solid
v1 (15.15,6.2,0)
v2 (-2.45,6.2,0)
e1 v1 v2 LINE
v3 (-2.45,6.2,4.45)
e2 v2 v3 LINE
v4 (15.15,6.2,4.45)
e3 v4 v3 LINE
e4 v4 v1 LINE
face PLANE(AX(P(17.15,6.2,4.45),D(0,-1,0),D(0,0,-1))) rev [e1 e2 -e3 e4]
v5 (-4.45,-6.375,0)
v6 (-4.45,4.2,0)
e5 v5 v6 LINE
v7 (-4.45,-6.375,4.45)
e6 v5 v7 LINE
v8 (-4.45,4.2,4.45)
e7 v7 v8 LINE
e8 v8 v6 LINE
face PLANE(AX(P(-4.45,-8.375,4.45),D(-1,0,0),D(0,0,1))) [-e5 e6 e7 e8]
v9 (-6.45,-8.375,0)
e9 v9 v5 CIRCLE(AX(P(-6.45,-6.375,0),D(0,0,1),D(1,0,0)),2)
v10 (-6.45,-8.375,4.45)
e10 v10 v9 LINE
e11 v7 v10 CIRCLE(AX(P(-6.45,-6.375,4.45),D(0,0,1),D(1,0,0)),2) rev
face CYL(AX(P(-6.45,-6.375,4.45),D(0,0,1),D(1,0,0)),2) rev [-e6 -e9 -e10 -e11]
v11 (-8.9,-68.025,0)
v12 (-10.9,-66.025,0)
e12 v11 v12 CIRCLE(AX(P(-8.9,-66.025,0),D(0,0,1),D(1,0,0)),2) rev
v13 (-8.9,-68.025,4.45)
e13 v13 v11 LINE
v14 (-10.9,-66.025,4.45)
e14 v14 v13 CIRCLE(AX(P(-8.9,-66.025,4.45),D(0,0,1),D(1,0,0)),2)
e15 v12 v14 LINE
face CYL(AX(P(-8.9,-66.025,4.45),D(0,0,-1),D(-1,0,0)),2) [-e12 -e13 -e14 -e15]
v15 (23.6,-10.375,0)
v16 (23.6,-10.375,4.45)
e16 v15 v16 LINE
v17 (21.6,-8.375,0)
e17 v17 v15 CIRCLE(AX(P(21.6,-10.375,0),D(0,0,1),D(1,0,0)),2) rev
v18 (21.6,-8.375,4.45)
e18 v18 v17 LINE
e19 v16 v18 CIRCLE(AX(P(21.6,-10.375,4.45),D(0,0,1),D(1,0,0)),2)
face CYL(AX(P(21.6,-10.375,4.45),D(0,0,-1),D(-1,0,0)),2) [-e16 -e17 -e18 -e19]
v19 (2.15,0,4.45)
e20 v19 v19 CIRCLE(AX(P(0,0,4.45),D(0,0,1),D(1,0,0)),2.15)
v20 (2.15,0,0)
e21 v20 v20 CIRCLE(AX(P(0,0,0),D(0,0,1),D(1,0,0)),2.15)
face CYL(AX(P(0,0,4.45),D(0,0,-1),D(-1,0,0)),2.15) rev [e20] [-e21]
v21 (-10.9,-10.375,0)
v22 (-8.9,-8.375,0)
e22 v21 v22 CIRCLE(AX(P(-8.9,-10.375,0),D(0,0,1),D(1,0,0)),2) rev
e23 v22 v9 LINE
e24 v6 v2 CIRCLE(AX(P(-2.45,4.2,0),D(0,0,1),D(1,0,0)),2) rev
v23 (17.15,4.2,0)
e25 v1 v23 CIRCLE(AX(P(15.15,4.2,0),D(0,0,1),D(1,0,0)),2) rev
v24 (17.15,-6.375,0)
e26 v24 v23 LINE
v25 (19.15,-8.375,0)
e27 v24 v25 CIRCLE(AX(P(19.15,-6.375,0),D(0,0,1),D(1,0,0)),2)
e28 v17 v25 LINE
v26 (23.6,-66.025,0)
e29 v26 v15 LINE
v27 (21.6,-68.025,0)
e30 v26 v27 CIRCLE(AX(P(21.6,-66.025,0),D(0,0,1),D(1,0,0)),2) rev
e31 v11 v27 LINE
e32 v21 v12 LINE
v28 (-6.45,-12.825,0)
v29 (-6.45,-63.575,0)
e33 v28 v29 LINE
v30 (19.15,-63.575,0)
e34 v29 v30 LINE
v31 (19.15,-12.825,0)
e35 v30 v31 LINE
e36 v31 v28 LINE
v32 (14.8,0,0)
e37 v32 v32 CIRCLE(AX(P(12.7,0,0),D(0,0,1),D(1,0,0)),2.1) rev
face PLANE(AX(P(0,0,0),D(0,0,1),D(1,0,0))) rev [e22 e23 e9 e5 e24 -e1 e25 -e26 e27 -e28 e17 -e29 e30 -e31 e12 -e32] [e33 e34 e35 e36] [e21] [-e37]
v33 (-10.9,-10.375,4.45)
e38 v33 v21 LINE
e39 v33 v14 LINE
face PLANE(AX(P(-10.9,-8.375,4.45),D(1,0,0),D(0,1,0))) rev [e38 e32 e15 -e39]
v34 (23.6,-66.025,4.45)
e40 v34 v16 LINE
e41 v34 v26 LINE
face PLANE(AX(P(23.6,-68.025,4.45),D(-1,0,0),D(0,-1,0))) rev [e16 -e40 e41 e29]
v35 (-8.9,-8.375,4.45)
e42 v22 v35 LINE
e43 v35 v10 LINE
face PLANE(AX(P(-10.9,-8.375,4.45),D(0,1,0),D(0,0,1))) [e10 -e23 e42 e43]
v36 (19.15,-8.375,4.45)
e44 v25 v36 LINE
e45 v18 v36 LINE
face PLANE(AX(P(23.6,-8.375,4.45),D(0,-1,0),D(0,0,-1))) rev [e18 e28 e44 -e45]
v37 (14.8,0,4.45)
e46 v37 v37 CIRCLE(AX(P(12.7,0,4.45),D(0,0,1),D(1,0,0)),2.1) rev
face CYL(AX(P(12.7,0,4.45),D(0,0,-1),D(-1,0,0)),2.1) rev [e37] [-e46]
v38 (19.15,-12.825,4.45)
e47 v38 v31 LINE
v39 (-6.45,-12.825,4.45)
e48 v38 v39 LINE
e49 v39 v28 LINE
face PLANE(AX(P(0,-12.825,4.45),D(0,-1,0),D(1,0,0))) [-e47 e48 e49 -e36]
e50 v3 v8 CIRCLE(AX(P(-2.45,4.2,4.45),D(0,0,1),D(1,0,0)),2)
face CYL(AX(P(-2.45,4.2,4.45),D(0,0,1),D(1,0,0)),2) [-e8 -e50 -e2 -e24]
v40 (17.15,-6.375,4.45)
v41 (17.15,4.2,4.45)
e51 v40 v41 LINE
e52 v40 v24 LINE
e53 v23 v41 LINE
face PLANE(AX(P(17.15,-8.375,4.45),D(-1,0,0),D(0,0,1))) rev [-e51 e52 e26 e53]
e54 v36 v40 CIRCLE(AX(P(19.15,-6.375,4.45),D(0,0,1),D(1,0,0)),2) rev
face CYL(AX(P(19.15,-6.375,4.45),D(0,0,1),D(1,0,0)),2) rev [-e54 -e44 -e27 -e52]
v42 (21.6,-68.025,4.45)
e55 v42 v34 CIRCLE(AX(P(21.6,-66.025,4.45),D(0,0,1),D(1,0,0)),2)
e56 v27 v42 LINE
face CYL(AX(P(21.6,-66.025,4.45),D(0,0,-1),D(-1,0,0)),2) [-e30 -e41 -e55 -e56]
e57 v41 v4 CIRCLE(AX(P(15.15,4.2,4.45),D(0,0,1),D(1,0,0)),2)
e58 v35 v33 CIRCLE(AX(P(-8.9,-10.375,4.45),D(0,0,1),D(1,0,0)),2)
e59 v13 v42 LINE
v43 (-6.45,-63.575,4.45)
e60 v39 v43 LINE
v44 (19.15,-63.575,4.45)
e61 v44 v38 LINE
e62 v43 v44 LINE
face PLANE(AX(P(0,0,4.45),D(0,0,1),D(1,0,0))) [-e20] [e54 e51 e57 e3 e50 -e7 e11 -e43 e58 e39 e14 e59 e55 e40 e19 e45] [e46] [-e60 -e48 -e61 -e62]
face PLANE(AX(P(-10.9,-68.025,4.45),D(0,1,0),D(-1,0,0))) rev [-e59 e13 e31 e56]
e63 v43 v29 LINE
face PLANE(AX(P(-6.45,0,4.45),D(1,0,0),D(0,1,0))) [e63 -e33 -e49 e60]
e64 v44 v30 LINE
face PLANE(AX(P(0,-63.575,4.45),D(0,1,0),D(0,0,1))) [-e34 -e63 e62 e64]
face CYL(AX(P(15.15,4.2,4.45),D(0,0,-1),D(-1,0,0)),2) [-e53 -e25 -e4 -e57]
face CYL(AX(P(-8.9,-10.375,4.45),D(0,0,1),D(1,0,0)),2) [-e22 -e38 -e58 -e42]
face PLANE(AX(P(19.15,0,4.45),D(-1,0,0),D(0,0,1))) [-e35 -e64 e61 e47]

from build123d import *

# Parameters (mm, degrees)
SKETCH3_W           = 25.6
SKETCH3_H           = 50.75
SKETCH3_R           = 2.15
SKETCH3_R_2         = 2.1
BOSS_EXTRUDE1_DEPTH = 4.45
FILLET1_R           = 2


with BuildPart() as part:
    # Sketch3 → Boss-Extrude1 (new body)
    with BuildSketch(Plane.XY):
        Polygon((-4.45, -8.375), (-10.9, -8.375), (-10.9, -68.025), (23.6, -68.025), (23.6, -8.375), (17.15, -8.375), (17.15, 6.2), (-4.45, 6.2), align=None)
        with Locations((6.35, -38.2)):
            Rectangle(SKETCH3_W, SKETCH3_H, mode=Mode.SUBTRACT)
        Circle(SKETCH3_R, mode=Mode.SUBTRACT)
        with Locations((12.7, 0)):
            Circle(SKETCH3_R_2, mode=Mode.SUBTRACT)
    extrude(amount=BOSS_EXTRUDE1_DEPTH)

    # Fillet1
    fillet1_edges = [part.edges().sort_by_distance(p)[0] for p in [
        (-10.9, -68.025, 2.225),
        (23.6, -68.025, 2.225),
        (-10.9, -8.375, 2.225),
        (23.6, -8.375, 2.225),
        (17.15, -8.375, 2.225),
        (17.15, 6.2, 2.225),
        (-4.45, 6.2, 2.225),
        (-4.45, -8.375, 2.225),
    ]]
    fillet(fillet1_edges, radius=FILLET1_R)


solid = part.part
